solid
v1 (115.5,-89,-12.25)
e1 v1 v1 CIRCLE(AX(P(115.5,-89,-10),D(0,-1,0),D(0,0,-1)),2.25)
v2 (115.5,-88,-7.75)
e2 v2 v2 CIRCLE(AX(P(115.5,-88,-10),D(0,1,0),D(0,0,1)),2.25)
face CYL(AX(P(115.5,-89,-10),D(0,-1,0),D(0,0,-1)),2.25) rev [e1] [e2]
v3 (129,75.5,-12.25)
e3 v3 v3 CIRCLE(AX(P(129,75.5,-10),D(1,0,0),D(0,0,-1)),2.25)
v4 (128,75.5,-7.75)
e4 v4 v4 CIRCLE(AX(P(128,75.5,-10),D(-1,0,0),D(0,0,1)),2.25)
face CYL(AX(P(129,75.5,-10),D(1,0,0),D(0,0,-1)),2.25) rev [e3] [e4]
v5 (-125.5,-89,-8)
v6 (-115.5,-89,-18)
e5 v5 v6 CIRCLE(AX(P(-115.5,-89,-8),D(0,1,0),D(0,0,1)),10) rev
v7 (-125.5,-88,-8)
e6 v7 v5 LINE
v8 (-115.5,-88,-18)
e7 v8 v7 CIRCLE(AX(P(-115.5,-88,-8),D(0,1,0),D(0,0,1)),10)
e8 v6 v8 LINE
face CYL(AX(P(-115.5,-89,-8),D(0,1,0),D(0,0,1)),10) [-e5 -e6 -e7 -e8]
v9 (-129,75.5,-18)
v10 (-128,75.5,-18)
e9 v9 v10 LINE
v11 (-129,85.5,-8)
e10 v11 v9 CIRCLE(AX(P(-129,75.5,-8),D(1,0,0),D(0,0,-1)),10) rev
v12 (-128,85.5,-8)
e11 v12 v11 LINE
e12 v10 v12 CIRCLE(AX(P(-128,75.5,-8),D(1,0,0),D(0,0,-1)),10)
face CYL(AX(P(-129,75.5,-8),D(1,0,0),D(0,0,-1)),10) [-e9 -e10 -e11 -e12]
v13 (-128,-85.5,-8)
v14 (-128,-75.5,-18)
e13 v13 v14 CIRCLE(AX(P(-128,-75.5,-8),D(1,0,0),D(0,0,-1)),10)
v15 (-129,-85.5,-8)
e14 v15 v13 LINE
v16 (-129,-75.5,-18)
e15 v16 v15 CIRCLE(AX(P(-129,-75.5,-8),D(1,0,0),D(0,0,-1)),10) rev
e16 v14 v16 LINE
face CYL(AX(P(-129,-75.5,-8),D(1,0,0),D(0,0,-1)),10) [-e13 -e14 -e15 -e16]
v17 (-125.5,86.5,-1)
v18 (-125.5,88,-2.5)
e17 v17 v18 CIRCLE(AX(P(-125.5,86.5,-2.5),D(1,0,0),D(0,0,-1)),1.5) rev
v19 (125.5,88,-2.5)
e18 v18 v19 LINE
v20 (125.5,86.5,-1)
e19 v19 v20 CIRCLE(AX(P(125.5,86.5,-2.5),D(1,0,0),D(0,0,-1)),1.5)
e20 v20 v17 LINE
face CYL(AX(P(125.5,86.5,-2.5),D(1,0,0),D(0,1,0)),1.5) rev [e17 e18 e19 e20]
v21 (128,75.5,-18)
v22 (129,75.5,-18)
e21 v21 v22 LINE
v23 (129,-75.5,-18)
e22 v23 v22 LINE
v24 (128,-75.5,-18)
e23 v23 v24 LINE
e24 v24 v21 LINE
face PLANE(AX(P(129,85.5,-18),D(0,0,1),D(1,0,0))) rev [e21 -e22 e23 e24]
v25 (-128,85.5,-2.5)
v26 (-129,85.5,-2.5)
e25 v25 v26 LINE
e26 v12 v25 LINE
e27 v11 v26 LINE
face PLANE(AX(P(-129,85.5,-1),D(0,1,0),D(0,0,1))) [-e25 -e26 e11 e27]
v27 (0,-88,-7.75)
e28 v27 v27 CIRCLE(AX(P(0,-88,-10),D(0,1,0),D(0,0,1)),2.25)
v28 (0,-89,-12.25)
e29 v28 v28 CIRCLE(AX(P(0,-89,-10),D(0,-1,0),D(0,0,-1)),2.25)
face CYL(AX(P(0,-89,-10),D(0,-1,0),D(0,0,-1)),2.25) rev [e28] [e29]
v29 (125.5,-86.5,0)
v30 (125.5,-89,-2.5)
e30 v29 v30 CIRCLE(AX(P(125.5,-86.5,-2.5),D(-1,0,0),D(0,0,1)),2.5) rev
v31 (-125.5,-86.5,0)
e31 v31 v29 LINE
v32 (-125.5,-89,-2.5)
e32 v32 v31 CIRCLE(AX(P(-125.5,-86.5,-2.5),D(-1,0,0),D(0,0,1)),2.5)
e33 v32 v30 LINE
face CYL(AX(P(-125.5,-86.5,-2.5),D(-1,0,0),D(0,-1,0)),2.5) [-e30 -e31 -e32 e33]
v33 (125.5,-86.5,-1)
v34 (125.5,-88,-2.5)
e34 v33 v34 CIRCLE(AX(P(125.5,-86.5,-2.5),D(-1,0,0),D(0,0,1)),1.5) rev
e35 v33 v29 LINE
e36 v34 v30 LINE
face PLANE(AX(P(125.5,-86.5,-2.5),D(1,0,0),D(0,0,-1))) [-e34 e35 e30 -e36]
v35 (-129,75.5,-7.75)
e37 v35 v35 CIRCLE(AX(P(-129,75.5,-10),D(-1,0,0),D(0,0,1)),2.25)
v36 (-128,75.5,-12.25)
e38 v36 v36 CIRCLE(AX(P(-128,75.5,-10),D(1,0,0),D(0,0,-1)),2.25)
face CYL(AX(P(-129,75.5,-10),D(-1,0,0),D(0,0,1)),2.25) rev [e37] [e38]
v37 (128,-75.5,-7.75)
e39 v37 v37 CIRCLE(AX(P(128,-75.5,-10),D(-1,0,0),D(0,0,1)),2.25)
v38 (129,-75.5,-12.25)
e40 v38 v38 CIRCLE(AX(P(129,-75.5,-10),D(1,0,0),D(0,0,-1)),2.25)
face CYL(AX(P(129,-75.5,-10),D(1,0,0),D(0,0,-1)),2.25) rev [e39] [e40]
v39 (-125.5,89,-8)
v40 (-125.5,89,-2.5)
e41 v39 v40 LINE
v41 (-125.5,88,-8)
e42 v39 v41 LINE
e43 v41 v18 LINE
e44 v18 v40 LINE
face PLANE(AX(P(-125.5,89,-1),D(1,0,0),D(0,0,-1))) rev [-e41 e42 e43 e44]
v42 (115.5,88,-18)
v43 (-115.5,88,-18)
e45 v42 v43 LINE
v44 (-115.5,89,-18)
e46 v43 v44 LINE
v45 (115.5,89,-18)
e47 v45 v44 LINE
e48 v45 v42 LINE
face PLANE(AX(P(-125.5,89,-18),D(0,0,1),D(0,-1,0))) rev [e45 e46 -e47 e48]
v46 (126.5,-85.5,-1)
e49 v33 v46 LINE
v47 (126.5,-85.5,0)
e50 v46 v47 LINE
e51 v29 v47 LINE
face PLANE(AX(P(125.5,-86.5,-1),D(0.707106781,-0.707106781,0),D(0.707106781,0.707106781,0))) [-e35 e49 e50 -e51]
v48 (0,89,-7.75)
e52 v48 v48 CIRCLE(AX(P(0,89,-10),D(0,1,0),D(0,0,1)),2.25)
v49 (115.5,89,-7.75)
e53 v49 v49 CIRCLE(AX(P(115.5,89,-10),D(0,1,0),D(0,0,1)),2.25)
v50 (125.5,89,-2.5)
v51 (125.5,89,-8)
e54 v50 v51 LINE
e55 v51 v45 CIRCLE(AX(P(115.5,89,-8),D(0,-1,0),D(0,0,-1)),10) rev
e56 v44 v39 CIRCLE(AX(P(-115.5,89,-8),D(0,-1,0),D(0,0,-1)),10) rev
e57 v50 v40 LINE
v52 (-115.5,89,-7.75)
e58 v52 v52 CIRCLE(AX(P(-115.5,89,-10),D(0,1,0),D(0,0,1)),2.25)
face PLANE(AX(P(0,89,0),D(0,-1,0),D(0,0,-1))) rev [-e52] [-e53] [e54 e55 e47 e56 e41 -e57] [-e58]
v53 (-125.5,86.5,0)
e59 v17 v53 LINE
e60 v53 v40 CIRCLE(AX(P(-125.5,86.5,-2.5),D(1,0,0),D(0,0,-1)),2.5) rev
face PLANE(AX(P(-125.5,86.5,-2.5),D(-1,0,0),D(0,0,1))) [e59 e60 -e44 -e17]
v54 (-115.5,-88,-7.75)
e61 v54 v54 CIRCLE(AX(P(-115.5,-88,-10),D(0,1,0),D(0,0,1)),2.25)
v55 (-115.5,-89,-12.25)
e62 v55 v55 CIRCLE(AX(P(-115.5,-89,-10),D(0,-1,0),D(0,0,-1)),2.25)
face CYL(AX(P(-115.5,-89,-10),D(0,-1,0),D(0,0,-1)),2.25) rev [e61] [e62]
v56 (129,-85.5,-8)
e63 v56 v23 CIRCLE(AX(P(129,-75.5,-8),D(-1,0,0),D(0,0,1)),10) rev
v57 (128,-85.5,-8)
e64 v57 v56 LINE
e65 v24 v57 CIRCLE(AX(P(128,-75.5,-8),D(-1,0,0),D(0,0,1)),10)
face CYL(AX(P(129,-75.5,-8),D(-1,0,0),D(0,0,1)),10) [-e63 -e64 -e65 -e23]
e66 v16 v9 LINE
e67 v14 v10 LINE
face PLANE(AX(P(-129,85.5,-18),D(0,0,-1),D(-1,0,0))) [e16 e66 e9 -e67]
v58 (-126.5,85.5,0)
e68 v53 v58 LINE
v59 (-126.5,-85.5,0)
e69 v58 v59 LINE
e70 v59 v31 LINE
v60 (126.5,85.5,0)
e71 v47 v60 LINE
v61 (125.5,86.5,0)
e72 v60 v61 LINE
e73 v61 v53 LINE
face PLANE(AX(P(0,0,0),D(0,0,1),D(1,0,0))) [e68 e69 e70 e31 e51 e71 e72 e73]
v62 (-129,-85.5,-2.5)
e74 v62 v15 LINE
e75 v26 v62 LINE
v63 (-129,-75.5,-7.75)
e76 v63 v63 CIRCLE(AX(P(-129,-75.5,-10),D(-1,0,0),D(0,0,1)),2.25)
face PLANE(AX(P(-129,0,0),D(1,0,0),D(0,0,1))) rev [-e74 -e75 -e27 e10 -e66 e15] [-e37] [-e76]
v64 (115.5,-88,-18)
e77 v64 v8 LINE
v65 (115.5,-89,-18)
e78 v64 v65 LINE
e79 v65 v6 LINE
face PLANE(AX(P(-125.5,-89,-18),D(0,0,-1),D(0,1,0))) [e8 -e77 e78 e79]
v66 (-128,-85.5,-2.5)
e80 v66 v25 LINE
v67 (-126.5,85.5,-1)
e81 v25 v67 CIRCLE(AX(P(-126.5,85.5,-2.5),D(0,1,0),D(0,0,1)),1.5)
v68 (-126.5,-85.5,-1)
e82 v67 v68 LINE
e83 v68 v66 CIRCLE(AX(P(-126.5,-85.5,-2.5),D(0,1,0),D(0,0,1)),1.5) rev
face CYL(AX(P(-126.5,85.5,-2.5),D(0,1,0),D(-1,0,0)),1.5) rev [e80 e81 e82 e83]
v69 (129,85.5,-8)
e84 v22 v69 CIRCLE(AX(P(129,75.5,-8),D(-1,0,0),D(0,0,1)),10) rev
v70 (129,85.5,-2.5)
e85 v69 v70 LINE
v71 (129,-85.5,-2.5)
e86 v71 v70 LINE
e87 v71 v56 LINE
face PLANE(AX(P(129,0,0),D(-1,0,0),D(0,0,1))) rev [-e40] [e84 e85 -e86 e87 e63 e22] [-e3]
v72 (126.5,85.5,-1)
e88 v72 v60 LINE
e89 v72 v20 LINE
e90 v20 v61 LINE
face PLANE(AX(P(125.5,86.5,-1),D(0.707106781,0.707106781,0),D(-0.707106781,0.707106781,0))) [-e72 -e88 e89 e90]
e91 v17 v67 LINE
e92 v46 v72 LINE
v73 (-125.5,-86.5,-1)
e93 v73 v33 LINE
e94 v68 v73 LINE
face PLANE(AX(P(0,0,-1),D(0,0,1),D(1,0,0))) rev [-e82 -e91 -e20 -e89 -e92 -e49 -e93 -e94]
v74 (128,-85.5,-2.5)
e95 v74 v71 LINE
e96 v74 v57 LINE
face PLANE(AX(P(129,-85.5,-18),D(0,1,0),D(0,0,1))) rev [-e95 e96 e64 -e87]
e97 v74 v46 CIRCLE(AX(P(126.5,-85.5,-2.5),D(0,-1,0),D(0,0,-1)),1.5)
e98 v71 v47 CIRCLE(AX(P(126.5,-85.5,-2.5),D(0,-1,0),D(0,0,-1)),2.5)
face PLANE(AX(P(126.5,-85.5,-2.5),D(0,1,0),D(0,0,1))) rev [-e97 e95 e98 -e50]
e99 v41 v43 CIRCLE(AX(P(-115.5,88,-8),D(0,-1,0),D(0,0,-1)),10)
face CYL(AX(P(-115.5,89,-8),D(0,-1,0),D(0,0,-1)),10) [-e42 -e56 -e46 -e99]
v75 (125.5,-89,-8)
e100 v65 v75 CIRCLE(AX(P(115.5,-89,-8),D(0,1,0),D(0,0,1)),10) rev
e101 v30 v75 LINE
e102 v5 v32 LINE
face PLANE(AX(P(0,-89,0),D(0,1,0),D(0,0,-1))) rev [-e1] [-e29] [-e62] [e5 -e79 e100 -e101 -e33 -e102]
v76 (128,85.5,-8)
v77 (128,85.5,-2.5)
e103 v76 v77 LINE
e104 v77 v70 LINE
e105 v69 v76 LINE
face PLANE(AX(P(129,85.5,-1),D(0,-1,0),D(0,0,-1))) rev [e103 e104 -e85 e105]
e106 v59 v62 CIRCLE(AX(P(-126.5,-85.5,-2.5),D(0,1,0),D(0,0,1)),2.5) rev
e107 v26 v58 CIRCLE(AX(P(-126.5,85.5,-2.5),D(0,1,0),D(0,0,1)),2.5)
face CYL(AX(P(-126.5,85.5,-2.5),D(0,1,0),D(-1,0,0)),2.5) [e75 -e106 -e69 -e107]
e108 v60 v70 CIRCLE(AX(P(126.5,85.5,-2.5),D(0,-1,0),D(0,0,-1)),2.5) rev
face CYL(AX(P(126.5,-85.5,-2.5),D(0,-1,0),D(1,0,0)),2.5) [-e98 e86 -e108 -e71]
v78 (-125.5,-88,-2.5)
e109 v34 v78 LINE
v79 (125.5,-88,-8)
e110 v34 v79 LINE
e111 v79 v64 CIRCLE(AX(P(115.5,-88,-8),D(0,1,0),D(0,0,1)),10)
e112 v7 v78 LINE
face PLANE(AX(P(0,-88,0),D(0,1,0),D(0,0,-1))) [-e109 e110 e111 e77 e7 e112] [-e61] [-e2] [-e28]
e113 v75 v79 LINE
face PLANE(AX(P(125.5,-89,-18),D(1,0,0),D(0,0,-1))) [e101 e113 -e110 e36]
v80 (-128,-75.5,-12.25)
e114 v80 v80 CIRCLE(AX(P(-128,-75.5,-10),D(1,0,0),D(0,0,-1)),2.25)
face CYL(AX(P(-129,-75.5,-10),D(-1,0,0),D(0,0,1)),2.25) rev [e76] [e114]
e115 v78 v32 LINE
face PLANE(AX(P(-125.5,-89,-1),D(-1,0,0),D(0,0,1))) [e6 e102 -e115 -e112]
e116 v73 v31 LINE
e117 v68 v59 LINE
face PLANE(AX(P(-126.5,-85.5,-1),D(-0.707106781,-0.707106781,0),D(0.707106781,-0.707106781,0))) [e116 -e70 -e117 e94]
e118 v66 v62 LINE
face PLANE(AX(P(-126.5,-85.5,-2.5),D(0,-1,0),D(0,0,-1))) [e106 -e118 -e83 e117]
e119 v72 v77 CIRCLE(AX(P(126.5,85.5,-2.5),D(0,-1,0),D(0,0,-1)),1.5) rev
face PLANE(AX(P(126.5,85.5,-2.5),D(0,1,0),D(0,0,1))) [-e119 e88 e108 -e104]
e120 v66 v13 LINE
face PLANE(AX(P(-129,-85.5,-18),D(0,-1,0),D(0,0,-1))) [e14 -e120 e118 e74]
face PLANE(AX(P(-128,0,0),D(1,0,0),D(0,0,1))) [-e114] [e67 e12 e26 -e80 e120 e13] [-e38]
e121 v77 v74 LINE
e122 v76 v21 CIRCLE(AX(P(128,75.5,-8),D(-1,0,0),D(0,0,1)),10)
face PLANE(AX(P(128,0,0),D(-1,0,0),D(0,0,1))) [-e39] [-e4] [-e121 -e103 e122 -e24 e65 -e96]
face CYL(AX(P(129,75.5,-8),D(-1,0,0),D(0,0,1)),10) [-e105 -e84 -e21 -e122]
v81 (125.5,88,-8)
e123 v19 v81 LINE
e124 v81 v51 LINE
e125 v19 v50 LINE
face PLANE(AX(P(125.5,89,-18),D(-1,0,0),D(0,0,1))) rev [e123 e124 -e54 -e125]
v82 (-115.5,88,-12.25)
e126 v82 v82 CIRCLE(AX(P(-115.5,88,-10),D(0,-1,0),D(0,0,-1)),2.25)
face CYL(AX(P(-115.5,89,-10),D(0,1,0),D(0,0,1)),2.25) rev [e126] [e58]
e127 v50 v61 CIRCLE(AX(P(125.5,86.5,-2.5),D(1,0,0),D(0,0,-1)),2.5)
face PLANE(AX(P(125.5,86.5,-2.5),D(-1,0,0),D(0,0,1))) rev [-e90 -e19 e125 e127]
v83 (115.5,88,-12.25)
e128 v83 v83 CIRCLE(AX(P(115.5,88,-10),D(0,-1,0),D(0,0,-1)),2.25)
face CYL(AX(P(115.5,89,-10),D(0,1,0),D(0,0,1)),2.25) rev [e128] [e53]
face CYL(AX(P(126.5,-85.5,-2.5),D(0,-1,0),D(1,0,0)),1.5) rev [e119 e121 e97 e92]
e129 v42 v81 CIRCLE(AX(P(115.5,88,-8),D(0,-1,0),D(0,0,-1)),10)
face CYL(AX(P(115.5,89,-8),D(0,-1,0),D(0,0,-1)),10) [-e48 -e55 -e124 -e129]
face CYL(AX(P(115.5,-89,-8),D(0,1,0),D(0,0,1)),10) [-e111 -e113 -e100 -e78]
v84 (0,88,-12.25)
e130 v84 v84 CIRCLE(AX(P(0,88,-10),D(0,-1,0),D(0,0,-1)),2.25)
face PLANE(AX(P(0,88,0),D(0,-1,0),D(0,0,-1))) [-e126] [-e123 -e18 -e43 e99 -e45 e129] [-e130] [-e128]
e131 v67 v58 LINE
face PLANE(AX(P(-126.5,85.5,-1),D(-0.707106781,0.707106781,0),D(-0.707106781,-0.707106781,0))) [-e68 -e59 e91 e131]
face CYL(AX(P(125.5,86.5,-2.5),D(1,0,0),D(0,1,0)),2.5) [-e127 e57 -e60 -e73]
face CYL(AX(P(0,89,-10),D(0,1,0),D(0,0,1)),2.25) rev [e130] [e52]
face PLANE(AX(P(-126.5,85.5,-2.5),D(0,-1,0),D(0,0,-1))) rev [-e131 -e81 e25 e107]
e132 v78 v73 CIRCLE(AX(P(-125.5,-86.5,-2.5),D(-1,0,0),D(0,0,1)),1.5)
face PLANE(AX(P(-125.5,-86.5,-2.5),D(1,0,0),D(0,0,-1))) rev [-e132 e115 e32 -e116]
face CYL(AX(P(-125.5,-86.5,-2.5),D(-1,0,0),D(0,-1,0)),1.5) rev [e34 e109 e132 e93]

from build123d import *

# Parameters (mm, degrees)
MAIN_PLATE_DEPTH                         = 1
LONG_EDGE_DEPTH                          = 251
LONG_EDGE_FILLETS_R                      = 10
M4_CLEARANCE_HOLE1_D                     = 4.5
M4_CLEARANCE_HOLE1_DEPTH                 = 178
SHORT_EDGE_DEPTH                         = 171
SHORT_EDGE_FILLETS_R                     = 10
M4_CLEARANCE_HOLE2_D                     = 4.5
M4_CLEARANCE_HOLE2_DEPTH                 = 258
LONG_EDGE_FILLETS_OF_OTHER_LONG_EDGE_R   = 10
SHORT_EDGE_FILLETS_OF_OTHER_SHORT_EDGE_R = 10


# Sheet-metal steps are written as plain solids
with BuildPart() as part:
    # Sketch1 → Main Plate (new body)
    with BuildSketch(Plane.XY):
        Polygon((-126.5, -85.5), (-125.5, -86.5), (125.5, -86.5), (126.5, -85.5), (126.5, 85.5), (125.5, 86.5), (-125.5, 86.5), (-126.5, 85.5), align=None)
    extrude(amount=-MAIN_PLATE_DEPTH)

    # Long Edge section (across the edge) → Long Edge (add)
    with BuildSketch(Plane(origin=(-125.5, 88, -1), x_dir=(0, -1, 0), z_dir=(1, 0, 0))):
        with BuildLine():
            Line((-1, 1.5), (-1, 17))
            Line((-1, 17), (0, 17))
            Line((0, 17), (0, 1.5))
            ThreePointArc((0, 1.5), (0.439339828, 0.439339828), (1.5, 0))
            Line((1.5, 0), (1.5, -1))
            ThreePointArc((1.5, -1), (-0.267766953, -0.267766953), (-1, 1.5))
        make_face()
    long_edge = extrude(amount=LONG_EDGE_DEPTH)

    # Long Edge Fillets
    long_edge_fillets_edges = [part.edges().sort_by_distance(p)[0] for p in [
        (-125.5, 88.5, -18),
        (125.5, 88.5, -18),
    ]]
    fillet(long_edge_fillets_edges, radius=LONG_EDGE_FILLETS_R)

    # M4 Clearance Hole1
    with Locations(Plane(origin=(0, 89, 0), x_dir=(1, 0, 0), z_dir=(0, 1, 0))):
        with Locations((-115.5, 10), (115.5, 10), (0, 10)):
            m4_clearance_hole1 = Hole(M4_CLEARANCE_HOLE1_D / 2, depth=M4_CLEARANCE_HOLE1_DEPTH)

    # Short Edge section (across the edge) → Short Edge (add)
    with BuildSketch(Plane(origin=(128, 85.5, -1), x_dir=(-1, 0, 0), z_dir=(0, -1, 0))):
        with BuildLine():
            Line((-1, 1.5), (-1, 17))
            Line((-1, 17), (0, 17))
            Line((0, 17), (0, 1.5))
            ThreePointArc((0, 1.5), (0.439339828, 0.439339828), (1.5, 0))
            Line((1.5, 0), (1.5, -1))
            ThreePointArc((1.5, -1), (-0.267766953, -0.267766953), (-1, 1.5))
        make_face()
    short_edge = extrude(amount=SHORT_EDGE_DEPTH)

    # Short Edge Fillets
    short_edge_fillets_edges = [part.edges().sort_by_distance(p)[0] for p in [
        (128.5, 85.5, -18),
        (128.5, -85.5, -18),
    ]]
    fillet(short_edge_fillets_edges, radius=SHORT_EDGE_FILLETS_R)

    # M4 Clearance Hole2
    with Locations(Plane(origin=(129, 0, 0), x_dir=(0, 0, -1), z_dir=(1, 0, 0))):
        with Locations((10, -75.5), (10, 75.5)):
            m4_clearance_hole2 = Hole(M4_CLEARANCE_HOLE2_D / 2, depth=M4_CLEARANCE_HOLE2_DEPTH)

    # Other Long Edge: Long Edge, M4 Clearance Hole1 across plane
    add(long_edge.mirror(Plane.ZX))
    add(m4_clearance_hole1.mirror(Plane.ZX), mode=Mode.SUBTRACT)

    # Long Edge Fillets of Other Long Edge
    long_edge_fillets_of_other_long_edge_edges = [part.edges().sort_by_distance(p)[0] for p in [
        (-125.5, -88.5, -18),
        (125.5, -88.5, -18),
    ]]
    fillet(long_edge_fillets_of_other_long_edge_edges, radius=LONG_EDGE_FILLETS_OF_OTHER_LONG_EDGE_R)

    # Other Short Edge: Short Edge, M4 Clearance Hole2 across plane
    add(short_edge.mirror(Plane(origin=(0, 0, 0), x_dir=(0, 0, 1), z_dir=(1, 0, 0))))
    add(m4_clearance_hole2.mirror(Plane(origin=(0, 0, 0), x_dir=(0, 0, 1), z_dir=(1, 0, 0))), mode=Mode.SUBTRACT)

    # Short Edge Fillets of Other Short Edge
    short_edge_fillets_of_other_short_edge_edges = [part.edges().sort_by_distance(p)[0] for p in [
        (-128.5, 85.5, -18),
        (-128.5, -85.5, -18),
    ]]
    fillet(short_edge_fillets_of_other_short_edge_edges, radius=SHORT_EDGE_FILLETS_OF_OTHER_SHORT_EDGE_R)


solid = part.part
